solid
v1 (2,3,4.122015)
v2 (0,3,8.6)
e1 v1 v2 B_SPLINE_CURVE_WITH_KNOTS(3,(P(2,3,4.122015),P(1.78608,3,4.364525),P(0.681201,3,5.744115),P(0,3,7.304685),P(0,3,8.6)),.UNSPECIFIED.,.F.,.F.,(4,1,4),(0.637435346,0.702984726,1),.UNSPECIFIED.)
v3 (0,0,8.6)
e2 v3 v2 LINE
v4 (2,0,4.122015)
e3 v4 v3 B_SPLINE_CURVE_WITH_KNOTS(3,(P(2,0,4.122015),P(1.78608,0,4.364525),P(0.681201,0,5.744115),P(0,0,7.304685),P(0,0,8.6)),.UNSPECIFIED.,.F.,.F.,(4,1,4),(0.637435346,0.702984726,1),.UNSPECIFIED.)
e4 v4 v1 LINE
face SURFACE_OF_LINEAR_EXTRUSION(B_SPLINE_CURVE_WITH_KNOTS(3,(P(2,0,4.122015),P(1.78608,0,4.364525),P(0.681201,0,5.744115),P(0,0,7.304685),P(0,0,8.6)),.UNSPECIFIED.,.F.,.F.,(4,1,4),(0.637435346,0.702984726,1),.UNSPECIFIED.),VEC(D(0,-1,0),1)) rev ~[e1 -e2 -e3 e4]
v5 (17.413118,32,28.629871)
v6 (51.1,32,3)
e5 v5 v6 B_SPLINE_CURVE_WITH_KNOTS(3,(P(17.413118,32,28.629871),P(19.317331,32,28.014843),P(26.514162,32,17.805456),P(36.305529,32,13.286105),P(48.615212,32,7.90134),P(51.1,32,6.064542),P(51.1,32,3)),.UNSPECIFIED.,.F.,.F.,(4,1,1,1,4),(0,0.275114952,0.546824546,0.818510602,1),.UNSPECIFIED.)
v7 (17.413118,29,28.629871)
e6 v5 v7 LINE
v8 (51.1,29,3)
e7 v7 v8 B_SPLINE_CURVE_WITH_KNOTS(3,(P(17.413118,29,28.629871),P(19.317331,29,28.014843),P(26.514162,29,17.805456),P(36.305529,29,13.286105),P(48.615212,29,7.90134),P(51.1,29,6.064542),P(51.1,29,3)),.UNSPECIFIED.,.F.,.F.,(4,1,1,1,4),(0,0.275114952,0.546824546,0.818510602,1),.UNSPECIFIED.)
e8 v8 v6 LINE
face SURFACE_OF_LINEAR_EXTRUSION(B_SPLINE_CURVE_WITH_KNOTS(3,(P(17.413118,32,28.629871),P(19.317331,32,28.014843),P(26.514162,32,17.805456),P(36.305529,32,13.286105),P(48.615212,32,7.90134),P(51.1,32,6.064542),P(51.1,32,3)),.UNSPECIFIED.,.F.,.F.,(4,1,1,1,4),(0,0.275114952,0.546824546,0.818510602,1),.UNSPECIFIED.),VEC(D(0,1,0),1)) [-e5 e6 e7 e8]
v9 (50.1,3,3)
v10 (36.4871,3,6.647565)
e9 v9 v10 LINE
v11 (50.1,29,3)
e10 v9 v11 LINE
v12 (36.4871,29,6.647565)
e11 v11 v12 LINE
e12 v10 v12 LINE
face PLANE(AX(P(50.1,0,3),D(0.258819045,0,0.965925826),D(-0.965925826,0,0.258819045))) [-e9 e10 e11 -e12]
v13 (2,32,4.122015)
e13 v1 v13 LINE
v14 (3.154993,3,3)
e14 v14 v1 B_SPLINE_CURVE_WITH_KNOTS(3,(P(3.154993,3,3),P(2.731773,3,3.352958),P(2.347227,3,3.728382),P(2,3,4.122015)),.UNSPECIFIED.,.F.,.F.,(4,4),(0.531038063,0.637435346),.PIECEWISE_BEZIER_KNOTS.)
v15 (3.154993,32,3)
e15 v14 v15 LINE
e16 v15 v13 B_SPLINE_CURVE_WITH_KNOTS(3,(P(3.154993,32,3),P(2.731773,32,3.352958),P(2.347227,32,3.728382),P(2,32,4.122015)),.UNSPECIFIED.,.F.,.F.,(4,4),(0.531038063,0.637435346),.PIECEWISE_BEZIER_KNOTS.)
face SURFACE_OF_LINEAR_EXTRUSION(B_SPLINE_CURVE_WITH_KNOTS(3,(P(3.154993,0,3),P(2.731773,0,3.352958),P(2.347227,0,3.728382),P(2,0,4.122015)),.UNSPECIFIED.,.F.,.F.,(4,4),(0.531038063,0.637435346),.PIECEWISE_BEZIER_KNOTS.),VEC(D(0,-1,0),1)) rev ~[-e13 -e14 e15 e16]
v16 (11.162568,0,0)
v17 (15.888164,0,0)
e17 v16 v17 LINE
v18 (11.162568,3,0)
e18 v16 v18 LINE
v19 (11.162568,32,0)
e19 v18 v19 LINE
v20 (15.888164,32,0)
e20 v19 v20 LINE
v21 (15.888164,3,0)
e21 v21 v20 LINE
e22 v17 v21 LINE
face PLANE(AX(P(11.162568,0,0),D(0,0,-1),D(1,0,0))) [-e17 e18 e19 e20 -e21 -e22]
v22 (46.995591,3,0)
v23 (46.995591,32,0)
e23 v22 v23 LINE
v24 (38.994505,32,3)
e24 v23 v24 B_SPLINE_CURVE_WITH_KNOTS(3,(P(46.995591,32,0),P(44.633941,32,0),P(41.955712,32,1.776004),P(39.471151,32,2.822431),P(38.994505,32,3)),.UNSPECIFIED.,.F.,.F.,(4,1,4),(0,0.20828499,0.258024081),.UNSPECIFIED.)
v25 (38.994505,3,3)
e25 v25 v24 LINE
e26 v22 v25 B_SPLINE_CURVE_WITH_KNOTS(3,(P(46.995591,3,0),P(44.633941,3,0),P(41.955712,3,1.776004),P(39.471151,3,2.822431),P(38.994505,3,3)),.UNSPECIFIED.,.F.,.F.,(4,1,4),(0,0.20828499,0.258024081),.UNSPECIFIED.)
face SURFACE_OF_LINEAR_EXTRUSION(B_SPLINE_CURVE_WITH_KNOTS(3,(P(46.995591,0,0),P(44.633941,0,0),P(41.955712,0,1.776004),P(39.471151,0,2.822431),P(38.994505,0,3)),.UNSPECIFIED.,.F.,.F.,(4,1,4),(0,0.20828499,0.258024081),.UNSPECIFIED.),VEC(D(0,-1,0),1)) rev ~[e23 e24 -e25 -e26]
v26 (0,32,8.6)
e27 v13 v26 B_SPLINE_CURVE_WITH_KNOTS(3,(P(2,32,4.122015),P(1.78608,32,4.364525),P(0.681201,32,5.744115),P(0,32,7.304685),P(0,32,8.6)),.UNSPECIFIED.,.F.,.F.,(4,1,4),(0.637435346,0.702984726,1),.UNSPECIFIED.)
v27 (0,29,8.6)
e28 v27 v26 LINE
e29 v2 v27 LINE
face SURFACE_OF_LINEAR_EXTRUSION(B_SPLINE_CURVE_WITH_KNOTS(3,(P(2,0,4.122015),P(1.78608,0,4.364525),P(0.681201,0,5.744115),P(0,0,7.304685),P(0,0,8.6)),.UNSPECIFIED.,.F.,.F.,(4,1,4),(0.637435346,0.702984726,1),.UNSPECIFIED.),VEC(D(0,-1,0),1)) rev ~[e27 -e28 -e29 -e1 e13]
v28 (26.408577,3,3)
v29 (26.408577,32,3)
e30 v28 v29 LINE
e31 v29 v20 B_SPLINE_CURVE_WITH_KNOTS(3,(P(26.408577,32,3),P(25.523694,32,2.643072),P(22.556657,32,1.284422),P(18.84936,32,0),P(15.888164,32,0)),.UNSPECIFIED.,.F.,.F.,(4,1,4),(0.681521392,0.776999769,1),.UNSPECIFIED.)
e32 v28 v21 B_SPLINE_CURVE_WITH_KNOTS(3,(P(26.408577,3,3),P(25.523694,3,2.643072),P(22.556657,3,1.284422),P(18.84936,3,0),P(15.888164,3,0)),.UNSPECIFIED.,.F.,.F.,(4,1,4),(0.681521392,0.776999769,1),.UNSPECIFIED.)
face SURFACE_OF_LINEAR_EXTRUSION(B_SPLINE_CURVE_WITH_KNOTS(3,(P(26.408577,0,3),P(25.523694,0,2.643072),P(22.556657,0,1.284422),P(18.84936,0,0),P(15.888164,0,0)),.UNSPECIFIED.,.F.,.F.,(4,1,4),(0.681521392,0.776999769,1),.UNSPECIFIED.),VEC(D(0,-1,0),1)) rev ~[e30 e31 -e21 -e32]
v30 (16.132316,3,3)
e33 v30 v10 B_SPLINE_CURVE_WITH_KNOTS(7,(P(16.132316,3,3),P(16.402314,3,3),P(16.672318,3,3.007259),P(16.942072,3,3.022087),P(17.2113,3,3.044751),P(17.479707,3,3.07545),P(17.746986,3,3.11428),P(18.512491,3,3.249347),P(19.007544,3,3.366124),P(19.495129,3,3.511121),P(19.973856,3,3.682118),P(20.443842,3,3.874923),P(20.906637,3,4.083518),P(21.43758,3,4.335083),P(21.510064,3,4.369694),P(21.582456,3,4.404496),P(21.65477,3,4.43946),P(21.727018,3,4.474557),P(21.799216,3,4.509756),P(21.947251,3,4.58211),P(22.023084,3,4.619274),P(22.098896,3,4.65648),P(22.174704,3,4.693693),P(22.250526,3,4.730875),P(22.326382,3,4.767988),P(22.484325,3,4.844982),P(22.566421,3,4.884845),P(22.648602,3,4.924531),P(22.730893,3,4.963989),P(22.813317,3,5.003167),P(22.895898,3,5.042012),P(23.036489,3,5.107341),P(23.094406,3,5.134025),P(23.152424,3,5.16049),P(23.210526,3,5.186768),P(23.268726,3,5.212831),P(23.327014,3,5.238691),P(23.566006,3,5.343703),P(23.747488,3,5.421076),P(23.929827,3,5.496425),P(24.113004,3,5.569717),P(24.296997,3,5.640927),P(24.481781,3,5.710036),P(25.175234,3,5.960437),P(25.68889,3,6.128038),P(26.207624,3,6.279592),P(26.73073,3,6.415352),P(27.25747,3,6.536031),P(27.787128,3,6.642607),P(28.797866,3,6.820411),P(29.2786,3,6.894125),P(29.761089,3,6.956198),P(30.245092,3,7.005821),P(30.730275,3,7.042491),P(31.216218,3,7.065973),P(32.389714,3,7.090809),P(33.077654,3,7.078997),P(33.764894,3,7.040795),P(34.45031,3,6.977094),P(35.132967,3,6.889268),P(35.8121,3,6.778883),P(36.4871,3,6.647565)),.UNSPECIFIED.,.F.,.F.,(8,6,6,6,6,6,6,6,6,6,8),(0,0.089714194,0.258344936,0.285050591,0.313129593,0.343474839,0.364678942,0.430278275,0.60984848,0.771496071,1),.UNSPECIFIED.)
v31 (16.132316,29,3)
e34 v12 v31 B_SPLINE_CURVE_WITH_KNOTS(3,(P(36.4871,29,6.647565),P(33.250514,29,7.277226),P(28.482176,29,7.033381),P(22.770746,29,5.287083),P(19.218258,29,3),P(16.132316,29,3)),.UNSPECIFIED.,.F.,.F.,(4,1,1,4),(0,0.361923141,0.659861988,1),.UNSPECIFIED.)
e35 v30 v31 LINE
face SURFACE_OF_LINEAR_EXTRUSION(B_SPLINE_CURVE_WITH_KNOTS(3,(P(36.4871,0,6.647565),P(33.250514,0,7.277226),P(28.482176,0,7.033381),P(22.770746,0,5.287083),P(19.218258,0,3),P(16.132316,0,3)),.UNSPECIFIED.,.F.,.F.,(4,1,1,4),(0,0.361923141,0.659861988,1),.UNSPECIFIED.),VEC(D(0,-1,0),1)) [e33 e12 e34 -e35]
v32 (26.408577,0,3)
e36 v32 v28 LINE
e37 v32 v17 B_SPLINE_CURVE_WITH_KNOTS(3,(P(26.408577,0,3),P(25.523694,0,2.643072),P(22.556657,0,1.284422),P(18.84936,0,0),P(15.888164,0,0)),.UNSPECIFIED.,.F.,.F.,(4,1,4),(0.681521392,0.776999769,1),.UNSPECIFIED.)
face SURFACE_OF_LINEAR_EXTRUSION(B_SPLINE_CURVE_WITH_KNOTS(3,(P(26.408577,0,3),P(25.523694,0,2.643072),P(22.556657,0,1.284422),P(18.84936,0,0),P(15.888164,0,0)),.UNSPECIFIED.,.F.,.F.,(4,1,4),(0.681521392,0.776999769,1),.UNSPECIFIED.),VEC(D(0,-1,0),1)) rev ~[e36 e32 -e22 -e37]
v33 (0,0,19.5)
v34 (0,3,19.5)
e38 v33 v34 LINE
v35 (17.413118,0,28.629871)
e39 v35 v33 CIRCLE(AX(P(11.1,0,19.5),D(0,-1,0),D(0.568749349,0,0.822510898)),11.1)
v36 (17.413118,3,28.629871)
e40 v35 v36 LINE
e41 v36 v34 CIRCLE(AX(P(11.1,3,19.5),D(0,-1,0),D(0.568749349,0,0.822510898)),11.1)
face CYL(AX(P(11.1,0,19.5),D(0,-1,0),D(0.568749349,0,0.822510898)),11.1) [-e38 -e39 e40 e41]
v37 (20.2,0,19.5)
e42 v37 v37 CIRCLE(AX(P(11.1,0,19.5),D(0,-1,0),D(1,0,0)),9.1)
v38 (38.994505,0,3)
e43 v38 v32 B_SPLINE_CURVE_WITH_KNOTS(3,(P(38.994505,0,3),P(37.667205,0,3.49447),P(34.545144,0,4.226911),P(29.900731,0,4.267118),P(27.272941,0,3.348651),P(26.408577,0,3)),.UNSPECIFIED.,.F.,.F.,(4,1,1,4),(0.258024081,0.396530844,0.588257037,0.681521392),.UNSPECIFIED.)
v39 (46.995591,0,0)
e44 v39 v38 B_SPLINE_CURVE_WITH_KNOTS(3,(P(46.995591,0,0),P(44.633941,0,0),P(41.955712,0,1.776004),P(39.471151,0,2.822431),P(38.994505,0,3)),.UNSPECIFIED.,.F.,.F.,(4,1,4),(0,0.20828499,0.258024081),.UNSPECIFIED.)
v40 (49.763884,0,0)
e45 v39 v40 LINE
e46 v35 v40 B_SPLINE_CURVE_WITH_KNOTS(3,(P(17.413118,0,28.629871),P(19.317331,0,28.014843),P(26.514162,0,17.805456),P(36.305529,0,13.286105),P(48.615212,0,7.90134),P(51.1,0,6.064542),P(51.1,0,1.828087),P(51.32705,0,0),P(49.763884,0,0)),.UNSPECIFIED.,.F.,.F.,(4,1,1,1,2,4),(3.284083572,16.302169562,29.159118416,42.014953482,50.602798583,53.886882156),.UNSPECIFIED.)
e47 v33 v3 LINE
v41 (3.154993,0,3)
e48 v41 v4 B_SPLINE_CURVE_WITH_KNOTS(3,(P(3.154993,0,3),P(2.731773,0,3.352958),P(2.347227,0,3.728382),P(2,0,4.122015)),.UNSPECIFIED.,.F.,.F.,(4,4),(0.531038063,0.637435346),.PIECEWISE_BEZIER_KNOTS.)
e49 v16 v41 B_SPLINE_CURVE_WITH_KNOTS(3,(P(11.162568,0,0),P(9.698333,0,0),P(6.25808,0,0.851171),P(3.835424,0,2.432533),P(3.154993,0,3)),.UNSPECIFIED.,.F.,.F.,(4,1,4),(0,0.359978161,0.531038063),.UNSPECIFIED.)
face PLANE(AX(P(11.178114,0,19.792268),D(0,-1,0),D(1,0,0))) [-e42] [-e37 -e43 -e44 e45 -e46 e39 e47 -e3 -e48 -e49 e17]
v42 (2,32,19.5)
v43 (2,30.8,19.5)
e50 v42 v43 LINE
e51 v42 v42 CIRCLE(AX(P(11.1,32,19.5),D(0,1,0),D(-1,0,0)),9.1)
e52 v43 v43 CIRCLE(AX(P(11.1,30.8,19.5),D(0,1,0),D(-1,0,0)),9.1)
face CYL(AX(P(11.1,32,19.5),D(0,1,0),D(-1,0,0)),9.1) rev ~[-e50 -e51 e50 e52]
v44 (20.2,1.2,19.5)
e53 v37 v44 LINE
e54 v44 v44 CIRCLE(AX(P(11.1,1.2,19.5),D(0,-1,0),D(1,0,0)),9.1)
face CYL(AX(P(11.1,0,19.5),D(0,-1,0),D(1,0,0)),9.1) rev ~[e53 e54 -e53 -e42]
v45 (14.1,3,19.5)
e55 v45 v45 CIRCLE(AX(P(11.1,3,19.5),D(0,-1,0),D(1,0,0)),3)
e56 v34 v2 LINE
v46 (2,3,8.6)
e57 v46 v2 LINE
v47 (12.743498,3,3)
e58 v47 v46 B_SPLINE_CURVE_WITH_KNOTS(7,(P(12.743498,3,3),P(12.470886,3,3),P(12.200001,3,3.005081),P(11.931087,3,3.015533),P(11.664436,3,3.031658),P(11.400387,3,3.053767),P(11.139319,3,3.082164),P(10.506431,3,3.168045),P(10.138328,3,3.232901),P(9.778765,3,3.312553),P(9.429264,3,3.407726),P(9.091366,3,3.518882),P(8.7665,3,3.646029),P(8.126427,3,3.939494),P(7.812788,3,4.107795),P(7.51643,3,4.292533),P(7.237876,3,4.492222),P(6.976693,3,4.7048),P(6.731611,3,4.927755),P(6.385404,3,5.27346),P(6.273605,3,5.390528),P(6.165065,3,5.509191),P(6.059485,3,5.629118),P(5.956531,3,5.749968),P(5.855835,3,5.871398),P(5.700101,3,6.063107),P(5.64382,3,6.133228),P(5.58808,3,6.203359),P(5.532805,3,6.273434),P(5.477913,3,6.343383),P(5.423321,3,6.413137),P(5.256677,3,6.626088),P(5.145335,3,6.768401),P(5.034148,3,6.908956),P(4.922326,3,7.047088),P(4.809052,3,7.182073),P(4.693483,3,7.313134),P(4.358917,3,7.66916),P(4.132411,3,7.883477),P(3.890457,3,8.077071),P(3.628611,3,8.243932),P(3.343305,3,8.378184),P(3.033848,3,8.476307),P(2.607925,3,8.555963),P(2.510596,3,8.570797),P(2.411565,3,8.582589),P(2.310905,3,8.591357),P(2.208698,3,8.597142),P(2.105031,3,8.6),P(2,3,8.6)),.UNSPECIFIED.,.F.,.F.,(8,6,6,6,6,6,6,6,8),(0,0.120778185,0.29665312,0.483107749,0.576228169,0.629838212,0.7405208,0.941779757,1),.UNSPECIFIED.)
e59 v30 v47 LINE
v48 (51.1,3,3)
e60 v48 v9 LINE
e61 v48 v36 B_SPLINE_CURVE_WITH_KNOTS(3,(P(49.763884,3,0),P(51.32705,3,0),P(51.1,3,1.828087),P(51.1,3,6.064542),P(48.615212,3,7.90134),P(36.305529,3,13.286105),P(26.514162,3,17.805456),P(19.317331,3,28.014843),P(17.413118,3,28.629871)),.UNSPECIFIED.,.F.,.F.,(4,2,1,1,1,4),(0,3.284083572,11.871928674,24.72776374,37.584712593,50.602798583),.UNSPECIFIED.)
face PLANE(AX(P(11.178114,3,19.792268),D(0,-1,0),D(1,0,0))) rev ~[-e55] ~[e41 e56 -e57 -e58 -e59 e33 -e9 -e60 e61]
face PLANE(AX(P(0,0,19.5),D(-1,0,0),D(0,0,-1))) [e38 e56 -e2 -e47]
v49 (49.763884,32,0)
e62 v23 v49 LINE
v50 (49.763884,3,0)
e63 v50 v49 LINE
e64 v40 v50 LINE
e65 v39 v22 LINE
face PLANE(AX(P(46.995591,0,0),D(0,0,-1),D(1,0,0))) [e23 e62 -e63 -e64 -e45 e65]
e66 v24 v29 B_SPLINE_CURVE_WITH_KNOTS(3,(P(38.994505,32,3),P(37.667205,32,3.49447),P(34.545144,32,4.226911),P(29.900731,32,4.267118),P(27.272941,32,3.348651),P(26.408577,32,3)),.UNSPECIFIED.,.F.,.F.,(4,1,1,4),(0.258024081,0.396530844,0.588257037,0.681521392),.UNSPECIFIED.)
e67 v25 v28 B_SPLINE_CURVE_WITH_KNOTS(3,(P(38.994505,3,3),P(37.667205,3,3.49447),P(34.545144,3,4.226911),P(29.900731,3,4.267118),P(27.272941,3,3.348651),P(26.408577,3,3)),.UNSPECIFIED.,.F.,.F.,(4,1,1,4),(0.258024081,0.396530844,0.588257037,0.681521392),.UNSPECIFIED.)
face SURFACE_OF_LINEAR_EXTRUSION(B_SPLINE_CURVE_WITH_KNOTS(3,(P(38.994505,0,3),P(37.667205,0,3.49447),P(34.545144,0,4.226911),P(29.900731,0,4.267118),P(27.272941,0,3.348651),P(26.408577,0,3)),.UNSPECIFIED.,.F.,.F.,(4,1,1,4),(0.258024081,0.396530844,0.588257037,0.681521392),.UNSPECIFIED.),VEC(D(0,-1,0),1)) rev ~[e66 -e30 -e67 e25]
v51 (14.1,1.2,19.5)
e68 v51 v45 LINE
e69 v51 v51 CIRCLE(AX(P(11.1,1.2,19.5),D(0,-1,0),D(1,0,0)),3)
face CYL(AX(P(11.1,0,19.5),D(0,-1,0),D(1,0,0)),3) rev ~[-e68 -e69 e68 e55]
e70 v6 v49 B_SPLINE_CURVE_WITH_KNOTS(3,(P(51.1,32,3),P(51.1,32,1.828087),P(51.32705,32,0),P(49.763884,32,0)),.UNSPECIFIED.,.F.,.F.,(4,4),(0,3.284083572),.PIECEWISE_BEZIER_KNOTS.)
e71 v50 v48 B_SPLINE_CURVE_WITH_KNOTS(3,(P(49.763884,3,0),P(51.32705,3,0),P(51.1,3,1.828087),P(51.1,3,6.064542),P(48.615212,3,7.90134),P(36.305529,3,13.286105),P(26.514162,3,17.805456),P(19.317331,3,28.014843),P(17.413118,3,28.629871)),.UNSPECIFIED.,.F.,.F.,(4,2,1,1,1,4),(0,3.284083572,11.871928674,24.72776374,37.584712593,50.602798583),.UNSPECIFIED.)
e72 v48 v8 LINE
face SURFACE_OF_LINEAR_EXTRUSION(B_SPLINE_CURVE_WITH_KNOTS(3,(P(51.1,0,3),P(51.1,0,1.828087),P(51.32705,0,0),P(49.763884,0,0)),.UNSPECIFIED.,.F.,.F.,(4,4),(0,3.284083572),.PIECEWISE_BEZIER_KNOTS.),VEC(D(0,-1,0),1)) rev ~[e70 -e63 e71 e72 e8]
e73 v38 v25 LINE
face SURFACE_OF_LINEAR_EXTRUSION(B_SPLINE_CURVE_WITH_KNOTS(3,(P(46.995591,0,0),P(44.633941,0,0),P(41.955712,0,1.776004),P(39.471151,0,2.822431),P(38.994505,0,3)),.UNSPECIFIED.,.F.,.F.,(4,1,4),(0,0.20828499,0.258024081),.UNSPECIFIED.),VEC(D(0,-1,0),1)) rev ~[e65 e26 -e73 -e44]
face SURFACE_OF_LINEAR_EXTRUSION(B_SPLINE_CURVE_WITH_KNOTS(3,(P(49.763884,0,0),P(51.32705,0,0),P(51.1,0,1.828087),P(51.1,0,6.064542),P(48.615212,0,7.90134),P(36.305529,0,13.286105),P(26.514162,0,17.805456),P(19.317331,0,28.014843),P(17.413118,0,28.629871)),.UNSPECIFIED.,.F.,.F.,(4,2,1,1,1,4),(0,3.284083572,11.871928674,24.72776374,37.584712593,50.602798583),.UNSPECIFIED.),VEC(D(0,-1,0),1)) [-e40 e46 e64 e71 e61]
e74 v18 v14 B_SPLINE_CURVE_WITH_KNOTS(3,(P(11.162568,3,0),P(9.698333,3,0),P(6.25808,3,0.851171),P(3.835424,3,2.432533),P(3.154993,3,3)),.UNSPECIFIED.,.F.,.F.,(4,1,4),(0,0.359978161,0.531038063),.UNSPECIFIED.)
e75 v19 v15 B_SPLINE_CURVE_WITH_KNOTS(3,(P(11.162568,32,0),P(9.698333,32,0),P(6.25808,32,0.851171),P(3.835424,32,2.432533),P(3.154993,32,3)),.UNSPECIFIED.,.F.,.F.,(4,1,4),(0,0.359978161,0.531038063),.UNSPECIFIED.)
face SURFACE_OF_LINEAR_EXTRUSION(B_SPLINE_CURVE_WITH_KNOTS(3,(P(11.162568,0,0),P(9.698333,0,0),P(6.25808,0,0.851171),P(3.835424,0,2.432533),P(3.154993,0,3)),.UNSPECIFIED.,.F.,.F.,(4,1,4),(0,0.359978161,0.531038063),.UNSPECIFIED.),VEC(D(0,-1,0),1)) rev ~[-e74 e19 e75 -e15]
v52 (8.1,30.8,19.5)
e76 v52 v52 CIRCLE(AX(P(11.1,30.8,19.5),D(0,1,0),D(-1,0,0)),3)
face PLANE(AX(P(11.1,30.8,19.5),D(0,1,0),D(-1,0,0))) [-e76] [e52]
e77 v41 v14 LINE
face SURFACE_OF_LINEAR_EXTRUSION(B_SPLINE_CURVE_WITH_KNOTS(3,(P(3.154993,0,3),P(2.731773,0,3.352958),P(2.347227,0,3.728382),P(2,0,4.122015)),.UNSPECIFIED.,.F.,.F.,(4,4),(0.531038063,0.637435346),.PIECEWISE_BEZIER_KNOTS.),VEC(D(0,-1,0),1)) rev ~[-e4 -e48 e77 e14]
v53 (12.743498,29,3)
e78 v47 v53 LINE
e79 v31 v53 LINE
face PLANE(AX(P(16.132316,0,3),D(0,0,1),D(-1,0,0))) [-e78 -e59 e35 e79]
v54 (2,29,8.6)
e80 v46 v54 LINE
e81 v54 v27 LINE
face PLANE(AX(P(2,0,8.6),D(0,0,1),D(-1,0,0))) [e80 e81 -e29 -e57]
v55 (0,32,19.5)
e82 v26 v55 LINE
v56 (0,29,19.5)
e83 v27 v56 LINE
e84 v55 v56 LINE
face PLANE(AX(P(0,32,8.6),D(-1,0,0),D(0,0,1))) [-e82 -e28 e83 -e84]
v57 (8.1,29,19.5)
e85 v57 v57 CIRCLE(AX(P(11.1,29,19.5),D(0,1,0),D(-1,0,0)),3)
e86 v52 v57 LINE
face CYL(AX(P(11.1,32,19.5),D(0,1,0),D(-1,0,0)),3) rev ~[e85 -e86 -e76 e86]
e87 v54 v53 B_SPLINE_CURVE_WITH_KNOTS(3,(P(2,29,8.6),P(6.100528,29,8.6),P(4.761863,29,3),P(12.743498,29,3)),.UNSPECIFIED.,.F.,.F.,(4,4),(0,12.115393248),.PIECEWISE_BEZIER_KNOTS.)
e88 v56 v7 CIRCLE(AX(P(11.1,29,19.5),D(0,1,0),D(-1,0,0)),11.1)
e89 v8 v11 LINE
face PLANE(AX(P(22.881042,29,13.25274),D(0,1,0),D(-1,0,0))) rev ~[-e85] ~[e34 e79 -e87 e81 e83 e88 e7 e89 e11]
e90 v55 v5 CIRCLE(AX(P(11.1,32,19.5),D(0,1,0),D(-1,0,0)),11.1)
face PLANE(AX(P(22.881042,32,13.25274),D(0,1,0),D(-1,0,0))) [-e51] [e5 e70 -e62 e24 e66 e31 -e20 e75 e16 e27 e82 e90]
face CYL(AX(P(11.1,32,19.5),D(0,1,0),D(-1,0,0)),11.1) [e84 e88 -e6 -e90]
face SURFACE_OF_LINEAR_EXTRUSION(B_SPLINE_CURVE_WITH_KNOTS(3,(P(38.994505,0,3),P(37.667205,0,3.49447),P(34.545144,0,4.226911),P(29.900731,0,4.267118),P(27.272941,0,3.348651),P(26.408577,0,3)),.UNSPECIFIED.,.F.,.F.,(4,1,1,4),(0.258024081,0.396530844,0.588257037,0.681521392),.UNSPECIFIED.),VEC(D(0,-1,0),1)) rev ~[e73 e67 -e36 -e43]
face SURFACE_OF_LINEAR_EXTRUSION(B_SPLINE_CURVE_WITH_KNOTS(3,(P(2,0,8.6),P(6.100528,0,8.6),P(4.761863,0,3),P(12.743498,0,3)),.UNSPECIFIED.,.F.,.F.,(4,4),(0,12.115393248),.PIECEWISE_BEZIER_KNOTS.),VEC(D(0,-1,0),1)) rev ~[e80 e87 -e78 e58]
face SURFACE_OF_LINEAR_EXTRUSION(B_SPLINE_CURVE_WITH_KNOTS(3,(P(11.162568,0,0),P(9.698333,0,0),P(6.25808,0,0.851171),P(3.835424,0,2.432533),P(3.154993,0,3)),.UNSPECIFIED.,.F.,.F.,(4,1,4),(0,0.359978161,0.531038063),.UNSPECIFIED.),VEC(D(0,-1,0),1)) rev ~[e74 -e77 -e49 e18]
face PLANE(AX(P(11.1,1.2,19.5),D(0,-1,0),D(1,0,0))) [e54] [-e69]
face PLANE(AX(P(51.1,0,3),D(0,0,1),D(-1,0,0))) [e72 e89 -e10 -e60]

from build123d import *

# Parameters (mm, degrees)
F0_R     = 9.1
F0_R_2   = 3
F1_DEPTH = 3
F2_DEPTH = 32
F3_R     = 9.1
F3_R_2   = 3
F4_DEPTH = 3
F5_DEPTH = 1.2
F6_DEPTH = 1.2


# Not quite as in the source:
# - the dataset's text gives a spline's control points without its knots; the knots are read off the source's solid


with BuildPart() as f1:
    # F0 (on Front) → F1 (new body)
    with BuildSketch(Plane.XZ):
        with BuildLine():
            ThreePointArc((17.4131177763, 28.6298709707), (5.94566238, 29.330707182), (0, 19.5000000088))
            ThreePointArc((0, 19.5000000088), (11.0999999956, 8.4), (22.2, 19.5))
            ThreePointArc((22.2, 19.5), (20.93070718, 24.6543376239), (17.4131177763, 28.6298709707))
        make_face()
        with Locations((11.1, 19.5)):
            Circle(F0_R, mode=Mode.SUBTRACT)
        with BuildLine():
            Line((0, 19.5000000088), (0, 8.6))
            Line((0, 8.6), (2, 8.6))
            add(Edge.make_bspline(
                [(2, 8.6), (6.1005279422, 8.6), (4.7618634999, 3), (12.7434981987, 3)],
                knots=[0, 0, 0, 0, 12.1153932477, 12.1153932477, 12.1153932477, 12.1153932477], degree=3))
            Line((12.7434981987, 3), (16.1323161151, 3))
            add(Edge.make_bspline(
                [(36.4871002909, 6.6475654837), (33.250513749, 7.2772264404), (28.4821757642, 7.0333812875), (22.7707461668, 5.2870830071), (19.2182583484, 3), (16.1323161151, 3)],
                knots=[0, 0, 0, 0, 0.3619231415, 0.6598619876, 1, 1, 1, 1], degree=3))
            Line((36.4871002909, 6.6475654837), (50.1, 3))
            Line((50.1, 3), (51.1, 3))
            add(Edge.make_bspline(
                [(17.4131177763, 28.6298709707), (19.3173309809, 28.0148434267), (26.5141621262, 17.8054561903), (36.3055294732, 13.2861047363), (48.6152121195, 7.9013395134), (51.1, 6.0645417062), (51.1, 3)],
                knots=[0, 0, 0, 0, 0.2751149516, 0.5468245458, 0.818510602, 1, 1, 1, 1], degree=3))
            ThreePointArc((17.4131177763, 28.6298709707), (20.93070718, 24.6543376239), (22.2, 19.5))
            ThreePointArc((22.2, 19.5), (11.0999999956, 8.4), (0, 19.5000000088))
        make_face()
        with Locations((11.1, 19.5)):
            Circle(F0_R)
        with Locations((11.1, 19.5)):
            Circle(F0_R_2, mode=Mode.SUBTRACT)
        with BuildLine():
            add(Edge.make_bspline(
                [(36.4871002909, 6.6475654837), (33.250513749, 7.2772264404), (28.4821757642, 7.0333812875), (22.7707461668, 5.2870830071), (19.2182583484, 3), (16.1323161151, 3)],
                knots=[0, 0, 0, 0, 0.3619231415, 0.6598619876, 1, 1, 1, 1], degree=3))
            Line((16.1323161151, 3), (26.4085768866, 3))
            add(Edge.make_bspline(
                [(38.9945048839, 3), (37.6672047291, 3.494469873), (34.5451444696, 4.2269106386), (29.9007307702, 4.2671179583), (27.2729407986, 3.3486511872), (26.4085768866, 3)],
                knots=[0.2580240809, 0.2580240809, 0.2580240809, 0.2580240809, 0.396530844, 0.588257037, 0.6815213918, 0.6815213918, 0.6815213918, 0.6815213918], degree=3))
            Line((38.9945048839, 3), (50.1, 3))
            Line((50.1, 3), (36.4871002909, 6.6475654837))
        make_face()
        with BuildLine():
            Line((12.7434981987, 3), (3.1549932572, 3))
            add(Edge.make_bspline(
                [(11.1625680027, 0), (9.6983325574, 0), (6.2580804616, 0.8511709187), (3.8354236598, 2.4325332537), (3.1549932572, 3)],
                knots=[0, 0, 0, 0, 0.3599781606, 0.5310380634, 0.5310380634, 0.5310380634, 0.5310380634], degree=3))
            Line((11.1625680027, 0), (15.8881638199, 0))
            add(Edge.make_bspline(
                [(26.4085768866, 3), (25.5236936564, 2.6430721083), (22.55665667, 1.2844222732), (18.8493595825, 0), (15.8881638199, 0)],
                knots=[0.6815213918, 0.6815213918, 0.6815213918, 0.6815213918, 0.776999769, 1, 1, 1, 1], degree=3))
            Line((26.4085768866, 3), (16.1323161151, 3))
            Line((16.1323161151, 3), (12.7434981987, 3))
        make_face()
        with BuildLine():
            add(Edge.make_bspline(
                [(51.1, 3), (51.1, 1.8280865625), (51.3270497322, 0), (49.7638843954, 0)],
                knots=[0, 0, 0, 0, 3.2840835722, 3.2840835722, 3.2840835722, 3.2840835722], degree=3))
            Line((51.1, 3), (50.1, 3))
            Line((50.1, 3), (38.9945048839, 3))
            add(Edge.make_bspline(
                [(46.9955906657, 0), (44.6339409881, 0), (41.9557123636, 1.7760040782), (39.4711509433, 2.8224311844), (38.9945048839, 3)],
                knots=[0, 0, 0, 0, 0.2082849902, 0.2580240809, 0.2580240809, 0.2580240809, 0.2580240809], degree=3))
            Line((46.9955906657, 0), (49.7638843954, 0))
        make_face()
        with BuildLine():
            add(Edge.make_bspline(
                [(3.1549932572, 3), (2.7317734101, 3.3529577584), (2.3472268202, 3.728382037), (2, 4.1220149827)],
                knots=[0.5310380634, 0.5310380634, 0.5310380634, 0.5310380634, 0.6374353462, 0.6374353462, 0.6374353462, 0.6374353462], degree=3))
            Line((3.1549932572, 3), (12.7434981987, 3))
            add(Edge.make_bspline(
                [(2, 8.6), (6.1005279422, 8.6), (4.7618634999, 3), (12.7434981987, 3)],
                knots=[0, 0, 0, 0, 12.1153932477, 12.1153932477, 12.1153932477, 12.1153932477], degree=3))
            Line((2, 8.6), (2, 4.1220149827))
        make_face()
        with BuildLine():
            Line((2, 8.6), (0, 8.6))
            add(Edge.make_bspline(
                [(2, 4.1220149827), (1.7860800359, 4.3645248947), (0.6812014398, 5.7441151101), (0, 7.3046851351), (0, 8.6)],
                knots=[0.6374353462, 0.6374353462, 0.6374353462, 0.6374353462, 0.7029847265, 1, 1, 1, 1], degree=3))
            Line((2, 4.1220149827), (2, 8.6))
        make_face()
    extrude(amount=-F1_DEPTH)

    # F0 (on Front) → F2 (join)
    with BuildSketch(Plane.XZ):
        with BuildLine():
            Line((12.7434981987, 3), (3.1549932572, 3))
            add(Edge.make_bspline(
                [(11.1625680027, 0), (9.6983325574, 0), (6.2580804616, 0.8511709187), (3.8354236598, 2.4325332537), (3.1549932572, 3)],
                knots=[0, 0, 0, 0, 0.3599781606, 0.5310380634, 0.5310380634, 0.5310380634, 0.5310380634], degree=3))
            Line((11.1625680027, 0), (15.8881638199, 0))
            add(Edge.make_bspline(
                [(26.4085768866, 3), (25.5236936564, 2.6430721083), (22.55665667, 1.2844222732), (18.8493595825, 0), (15.8881638199, 0)],
                knots=[0.6815213918, 0.6815213918, 0.6815213918, 0.6815213918, 0.776999769, 1, 1, 1, 1], degree=3))
            Line((26.4085768866, 3), (16.1323161151, 3))
            Line((16.1323161151, 3), (12.7434981987, 3))
        make_face()
        with BuildLine():
            Line((2, 8.6), (0, 8.6))
            add(Edge.make_bspline(
                [(2, 4.1220149827), (1.7860800359, 4.3645248947), (0.6812014398, 5.7441151101), (0, 7.3046851351), (0, 8.6)],
                knots=[0.6374353462, 0.6374353462, 0.6374353462, 0.6374353462, 0.7029847265, 1, 1, 1, 1], degree=3))
            Line((2, 4.1220149827), (2, 8.6))
        make_face()
        with BuildLine():
            add(Edge.make_bspline(
                [(36.4871002909, 6.6475654837), (33.250513749, 7.2772264404), (28.4821757642, 7.0333812875), (22.7707461668, 5.2870830071), (19.2182583484, 3), (16.1323161151, 3)],
                knots=[0, 0, 0, 0, 0.3619231415, 0.6598619876, 1, 1, 1, 1], degree=3))
            Line((16.1323161151, 3), (26.4085768866, 3))
            add(Edge.make_bspline(
                [(38.9945048839, 3), (37.6672047291, 3.494469873), (34.5451444696, 4.2269106386), (29.9007307702, 4.2671179583), (27.2729407986, 3.3486511872), (26.4085768866, 3)],
                knots=[0.2580240809, 0.2580240809, 0.2580240809, 0.2580240809, 0.396530844, 0.588257037, 0.6815213918, 0.6815213918, 0.6815213918, 0.6815213918], degree=3))
            Line((38.9945048839, 3), (50.1, 3))
            Line((50.1, 3), (36.4871002909, 6.6475654837))
        make_face()
        with BuildLine():
            add(Edge.make_bspline(
                [(51.1, 3), (51.1, 1.8280865625), (51.3270497322, 0), (49.7638843954, 0)],
                knots=[0, 0, 0, 0, 3.2840835722, 3.2840835722, 3.2840835722, 3.2840835722], degree=3))
            Line((51.1, 3), (50.1, 3))
            Line((50.1, 3), (38.9945048839, 3))
            add(Edge.make_bspline(
                [(46.9955906657, 0), (44.6339409881, 0), (41.9557123636, 1.7760040782), (39.4711509433, 2.8224311844), (38.9945048839, 3)],
                knots=[0, 0, 0, 0, 0.2082849902, 0.2580240809, 0.2580240809, 0.2580240809, 0.2580240809], degree=3))
            Line((46.9955906657, 0), (49.7638843954, 0))
        make_face()
        with BuildLine():
            add(Edge.make_bspline(
                [(3.1549932572, 3), (2.7317734101, 3.3529577584), (2.3472268202, 3.728382037), (2, 4.1220149827)],
                knots=[0.5310380634, 0.5310380634, 0.5310380634, 0.5310380634, 0.6374353462, 0.6374353462, 0.6374353462, 0.6374353462], degree=3))
            Line((3.1549932572, 3), (12.7434981987, 3))
            add(Edge.make_bspline(
                [(2, 8.6), (6.1005279422, 8.6), (4.7618634999, 3), (12.7434981987, 3)],
                knots=[0, 0, 0, 0, 12.1153932477, 12.1153932477, 12.1153932477, 12.1153932477], degree=3))
            Line((2, 8.6), (2, 4.1220149827))
        make_face()
    extrude(amount=-F2_DEPTH)

    # F3 (on face) → F4 (join)
    with BuildSketch(Plane(origin=(0, 32, 0), x_dir=(-1, 0, 0), z_dir=(0, 1, 0))):
        with BuildLine():
            ThreePointArc((0, 19.5), (-5.9456623761, 29.33070718), (-17.4131177763, 28.6298709707))
            add(Edge.make_bspline(
                [(-17.4131177763, 28.6298709707), (-19.3173309809, 28.0148434267), (-26.5141621262, 17.8054561903), (-36.3055294732, 13.2861047363), (-48.6152121195, 7.9013395134), (-51.1, 6.0645417062), (-51.1, 3)],
                knots=[0, 0, 0, 0, 0.2751149516, 0.5468245458, 0.818510602, 1, 1, 1, 1], degree=3))
            Line((-51.1, 3), (-50.1, 3))
            Line((-50.1, 3), (-36.4871002909, 6.6475654837))
            add(Edge.make_bspline(
                [(-36.4871002909, 6.6475654837), (-33.250513749, 7.2772264404), (-28.4821757642, 7.0333812875), (-22.7707461668, 5.2870830071), (-19.2182583484, 3), (-16.1323161151, 3)],
                knots=[0, 0, 0, 0, 0.3619231415, 0.6598619876, 1, 1, 1, 1], degree=3))
            Line((-16.1323161151, 3), (-12.7434981987, 3))
            add(Edge.make_bspline(
                [(-2, 8.6), (-6.1005279422, 8.6), (-4.7618634999, 3), (-12.7434981987, 3)],
                knots=[0, 0, 0, 0, 12.1153932477, 12.1153932477, 12.1153932477, 12.1153932477], degree=3))
            Line((-2, 8.6), (0, 8.6))
            Line((0, 8.6), (0, 19.5))
        make_face()
        with Locations((-11.1, 19.5)):
            Circle(F3_R, mode=Mode.SUBTRACT)
        with Locations((-11.1, 19.5)):
            Circle(F3_R)
        with Locations((-11.1, 19.5)):
            Circle(F3_R_2, mode=Mode.SUBTRACT)
    extrude(amount=-F4_DEPTH)

    # F0 (on Front) → F5 (cut)
    with BuildSketch(Plane.XZ):
        with Locations((11.1, 19.5)):
            Circle(F0_R)
        with Locations((11.1, 19.5)):
            Circle(F0_R_2, mode=Mode.SUBTRACT)
    extrude(amount=-F5_DEPTH, mode=Mode.SUBTRACT)

    # F3 (on face) → F6 (cut)
    with BuildSketch(Plane(origin=(0, 32, 0), x_dir=(-1, 0, 0), z_dir=(0, 1, 0))):
        with Locations((-11.1, 19.5)):
            Circle(F3_R)
        with Locations((-11.1, 19.5)):
            Circle(F3_R_2, mode=Mode.SUBTRACT)
    extrude(amount=-F6_DEPTH, mode=Mode.SUBTRACT)


solid = f1.part
